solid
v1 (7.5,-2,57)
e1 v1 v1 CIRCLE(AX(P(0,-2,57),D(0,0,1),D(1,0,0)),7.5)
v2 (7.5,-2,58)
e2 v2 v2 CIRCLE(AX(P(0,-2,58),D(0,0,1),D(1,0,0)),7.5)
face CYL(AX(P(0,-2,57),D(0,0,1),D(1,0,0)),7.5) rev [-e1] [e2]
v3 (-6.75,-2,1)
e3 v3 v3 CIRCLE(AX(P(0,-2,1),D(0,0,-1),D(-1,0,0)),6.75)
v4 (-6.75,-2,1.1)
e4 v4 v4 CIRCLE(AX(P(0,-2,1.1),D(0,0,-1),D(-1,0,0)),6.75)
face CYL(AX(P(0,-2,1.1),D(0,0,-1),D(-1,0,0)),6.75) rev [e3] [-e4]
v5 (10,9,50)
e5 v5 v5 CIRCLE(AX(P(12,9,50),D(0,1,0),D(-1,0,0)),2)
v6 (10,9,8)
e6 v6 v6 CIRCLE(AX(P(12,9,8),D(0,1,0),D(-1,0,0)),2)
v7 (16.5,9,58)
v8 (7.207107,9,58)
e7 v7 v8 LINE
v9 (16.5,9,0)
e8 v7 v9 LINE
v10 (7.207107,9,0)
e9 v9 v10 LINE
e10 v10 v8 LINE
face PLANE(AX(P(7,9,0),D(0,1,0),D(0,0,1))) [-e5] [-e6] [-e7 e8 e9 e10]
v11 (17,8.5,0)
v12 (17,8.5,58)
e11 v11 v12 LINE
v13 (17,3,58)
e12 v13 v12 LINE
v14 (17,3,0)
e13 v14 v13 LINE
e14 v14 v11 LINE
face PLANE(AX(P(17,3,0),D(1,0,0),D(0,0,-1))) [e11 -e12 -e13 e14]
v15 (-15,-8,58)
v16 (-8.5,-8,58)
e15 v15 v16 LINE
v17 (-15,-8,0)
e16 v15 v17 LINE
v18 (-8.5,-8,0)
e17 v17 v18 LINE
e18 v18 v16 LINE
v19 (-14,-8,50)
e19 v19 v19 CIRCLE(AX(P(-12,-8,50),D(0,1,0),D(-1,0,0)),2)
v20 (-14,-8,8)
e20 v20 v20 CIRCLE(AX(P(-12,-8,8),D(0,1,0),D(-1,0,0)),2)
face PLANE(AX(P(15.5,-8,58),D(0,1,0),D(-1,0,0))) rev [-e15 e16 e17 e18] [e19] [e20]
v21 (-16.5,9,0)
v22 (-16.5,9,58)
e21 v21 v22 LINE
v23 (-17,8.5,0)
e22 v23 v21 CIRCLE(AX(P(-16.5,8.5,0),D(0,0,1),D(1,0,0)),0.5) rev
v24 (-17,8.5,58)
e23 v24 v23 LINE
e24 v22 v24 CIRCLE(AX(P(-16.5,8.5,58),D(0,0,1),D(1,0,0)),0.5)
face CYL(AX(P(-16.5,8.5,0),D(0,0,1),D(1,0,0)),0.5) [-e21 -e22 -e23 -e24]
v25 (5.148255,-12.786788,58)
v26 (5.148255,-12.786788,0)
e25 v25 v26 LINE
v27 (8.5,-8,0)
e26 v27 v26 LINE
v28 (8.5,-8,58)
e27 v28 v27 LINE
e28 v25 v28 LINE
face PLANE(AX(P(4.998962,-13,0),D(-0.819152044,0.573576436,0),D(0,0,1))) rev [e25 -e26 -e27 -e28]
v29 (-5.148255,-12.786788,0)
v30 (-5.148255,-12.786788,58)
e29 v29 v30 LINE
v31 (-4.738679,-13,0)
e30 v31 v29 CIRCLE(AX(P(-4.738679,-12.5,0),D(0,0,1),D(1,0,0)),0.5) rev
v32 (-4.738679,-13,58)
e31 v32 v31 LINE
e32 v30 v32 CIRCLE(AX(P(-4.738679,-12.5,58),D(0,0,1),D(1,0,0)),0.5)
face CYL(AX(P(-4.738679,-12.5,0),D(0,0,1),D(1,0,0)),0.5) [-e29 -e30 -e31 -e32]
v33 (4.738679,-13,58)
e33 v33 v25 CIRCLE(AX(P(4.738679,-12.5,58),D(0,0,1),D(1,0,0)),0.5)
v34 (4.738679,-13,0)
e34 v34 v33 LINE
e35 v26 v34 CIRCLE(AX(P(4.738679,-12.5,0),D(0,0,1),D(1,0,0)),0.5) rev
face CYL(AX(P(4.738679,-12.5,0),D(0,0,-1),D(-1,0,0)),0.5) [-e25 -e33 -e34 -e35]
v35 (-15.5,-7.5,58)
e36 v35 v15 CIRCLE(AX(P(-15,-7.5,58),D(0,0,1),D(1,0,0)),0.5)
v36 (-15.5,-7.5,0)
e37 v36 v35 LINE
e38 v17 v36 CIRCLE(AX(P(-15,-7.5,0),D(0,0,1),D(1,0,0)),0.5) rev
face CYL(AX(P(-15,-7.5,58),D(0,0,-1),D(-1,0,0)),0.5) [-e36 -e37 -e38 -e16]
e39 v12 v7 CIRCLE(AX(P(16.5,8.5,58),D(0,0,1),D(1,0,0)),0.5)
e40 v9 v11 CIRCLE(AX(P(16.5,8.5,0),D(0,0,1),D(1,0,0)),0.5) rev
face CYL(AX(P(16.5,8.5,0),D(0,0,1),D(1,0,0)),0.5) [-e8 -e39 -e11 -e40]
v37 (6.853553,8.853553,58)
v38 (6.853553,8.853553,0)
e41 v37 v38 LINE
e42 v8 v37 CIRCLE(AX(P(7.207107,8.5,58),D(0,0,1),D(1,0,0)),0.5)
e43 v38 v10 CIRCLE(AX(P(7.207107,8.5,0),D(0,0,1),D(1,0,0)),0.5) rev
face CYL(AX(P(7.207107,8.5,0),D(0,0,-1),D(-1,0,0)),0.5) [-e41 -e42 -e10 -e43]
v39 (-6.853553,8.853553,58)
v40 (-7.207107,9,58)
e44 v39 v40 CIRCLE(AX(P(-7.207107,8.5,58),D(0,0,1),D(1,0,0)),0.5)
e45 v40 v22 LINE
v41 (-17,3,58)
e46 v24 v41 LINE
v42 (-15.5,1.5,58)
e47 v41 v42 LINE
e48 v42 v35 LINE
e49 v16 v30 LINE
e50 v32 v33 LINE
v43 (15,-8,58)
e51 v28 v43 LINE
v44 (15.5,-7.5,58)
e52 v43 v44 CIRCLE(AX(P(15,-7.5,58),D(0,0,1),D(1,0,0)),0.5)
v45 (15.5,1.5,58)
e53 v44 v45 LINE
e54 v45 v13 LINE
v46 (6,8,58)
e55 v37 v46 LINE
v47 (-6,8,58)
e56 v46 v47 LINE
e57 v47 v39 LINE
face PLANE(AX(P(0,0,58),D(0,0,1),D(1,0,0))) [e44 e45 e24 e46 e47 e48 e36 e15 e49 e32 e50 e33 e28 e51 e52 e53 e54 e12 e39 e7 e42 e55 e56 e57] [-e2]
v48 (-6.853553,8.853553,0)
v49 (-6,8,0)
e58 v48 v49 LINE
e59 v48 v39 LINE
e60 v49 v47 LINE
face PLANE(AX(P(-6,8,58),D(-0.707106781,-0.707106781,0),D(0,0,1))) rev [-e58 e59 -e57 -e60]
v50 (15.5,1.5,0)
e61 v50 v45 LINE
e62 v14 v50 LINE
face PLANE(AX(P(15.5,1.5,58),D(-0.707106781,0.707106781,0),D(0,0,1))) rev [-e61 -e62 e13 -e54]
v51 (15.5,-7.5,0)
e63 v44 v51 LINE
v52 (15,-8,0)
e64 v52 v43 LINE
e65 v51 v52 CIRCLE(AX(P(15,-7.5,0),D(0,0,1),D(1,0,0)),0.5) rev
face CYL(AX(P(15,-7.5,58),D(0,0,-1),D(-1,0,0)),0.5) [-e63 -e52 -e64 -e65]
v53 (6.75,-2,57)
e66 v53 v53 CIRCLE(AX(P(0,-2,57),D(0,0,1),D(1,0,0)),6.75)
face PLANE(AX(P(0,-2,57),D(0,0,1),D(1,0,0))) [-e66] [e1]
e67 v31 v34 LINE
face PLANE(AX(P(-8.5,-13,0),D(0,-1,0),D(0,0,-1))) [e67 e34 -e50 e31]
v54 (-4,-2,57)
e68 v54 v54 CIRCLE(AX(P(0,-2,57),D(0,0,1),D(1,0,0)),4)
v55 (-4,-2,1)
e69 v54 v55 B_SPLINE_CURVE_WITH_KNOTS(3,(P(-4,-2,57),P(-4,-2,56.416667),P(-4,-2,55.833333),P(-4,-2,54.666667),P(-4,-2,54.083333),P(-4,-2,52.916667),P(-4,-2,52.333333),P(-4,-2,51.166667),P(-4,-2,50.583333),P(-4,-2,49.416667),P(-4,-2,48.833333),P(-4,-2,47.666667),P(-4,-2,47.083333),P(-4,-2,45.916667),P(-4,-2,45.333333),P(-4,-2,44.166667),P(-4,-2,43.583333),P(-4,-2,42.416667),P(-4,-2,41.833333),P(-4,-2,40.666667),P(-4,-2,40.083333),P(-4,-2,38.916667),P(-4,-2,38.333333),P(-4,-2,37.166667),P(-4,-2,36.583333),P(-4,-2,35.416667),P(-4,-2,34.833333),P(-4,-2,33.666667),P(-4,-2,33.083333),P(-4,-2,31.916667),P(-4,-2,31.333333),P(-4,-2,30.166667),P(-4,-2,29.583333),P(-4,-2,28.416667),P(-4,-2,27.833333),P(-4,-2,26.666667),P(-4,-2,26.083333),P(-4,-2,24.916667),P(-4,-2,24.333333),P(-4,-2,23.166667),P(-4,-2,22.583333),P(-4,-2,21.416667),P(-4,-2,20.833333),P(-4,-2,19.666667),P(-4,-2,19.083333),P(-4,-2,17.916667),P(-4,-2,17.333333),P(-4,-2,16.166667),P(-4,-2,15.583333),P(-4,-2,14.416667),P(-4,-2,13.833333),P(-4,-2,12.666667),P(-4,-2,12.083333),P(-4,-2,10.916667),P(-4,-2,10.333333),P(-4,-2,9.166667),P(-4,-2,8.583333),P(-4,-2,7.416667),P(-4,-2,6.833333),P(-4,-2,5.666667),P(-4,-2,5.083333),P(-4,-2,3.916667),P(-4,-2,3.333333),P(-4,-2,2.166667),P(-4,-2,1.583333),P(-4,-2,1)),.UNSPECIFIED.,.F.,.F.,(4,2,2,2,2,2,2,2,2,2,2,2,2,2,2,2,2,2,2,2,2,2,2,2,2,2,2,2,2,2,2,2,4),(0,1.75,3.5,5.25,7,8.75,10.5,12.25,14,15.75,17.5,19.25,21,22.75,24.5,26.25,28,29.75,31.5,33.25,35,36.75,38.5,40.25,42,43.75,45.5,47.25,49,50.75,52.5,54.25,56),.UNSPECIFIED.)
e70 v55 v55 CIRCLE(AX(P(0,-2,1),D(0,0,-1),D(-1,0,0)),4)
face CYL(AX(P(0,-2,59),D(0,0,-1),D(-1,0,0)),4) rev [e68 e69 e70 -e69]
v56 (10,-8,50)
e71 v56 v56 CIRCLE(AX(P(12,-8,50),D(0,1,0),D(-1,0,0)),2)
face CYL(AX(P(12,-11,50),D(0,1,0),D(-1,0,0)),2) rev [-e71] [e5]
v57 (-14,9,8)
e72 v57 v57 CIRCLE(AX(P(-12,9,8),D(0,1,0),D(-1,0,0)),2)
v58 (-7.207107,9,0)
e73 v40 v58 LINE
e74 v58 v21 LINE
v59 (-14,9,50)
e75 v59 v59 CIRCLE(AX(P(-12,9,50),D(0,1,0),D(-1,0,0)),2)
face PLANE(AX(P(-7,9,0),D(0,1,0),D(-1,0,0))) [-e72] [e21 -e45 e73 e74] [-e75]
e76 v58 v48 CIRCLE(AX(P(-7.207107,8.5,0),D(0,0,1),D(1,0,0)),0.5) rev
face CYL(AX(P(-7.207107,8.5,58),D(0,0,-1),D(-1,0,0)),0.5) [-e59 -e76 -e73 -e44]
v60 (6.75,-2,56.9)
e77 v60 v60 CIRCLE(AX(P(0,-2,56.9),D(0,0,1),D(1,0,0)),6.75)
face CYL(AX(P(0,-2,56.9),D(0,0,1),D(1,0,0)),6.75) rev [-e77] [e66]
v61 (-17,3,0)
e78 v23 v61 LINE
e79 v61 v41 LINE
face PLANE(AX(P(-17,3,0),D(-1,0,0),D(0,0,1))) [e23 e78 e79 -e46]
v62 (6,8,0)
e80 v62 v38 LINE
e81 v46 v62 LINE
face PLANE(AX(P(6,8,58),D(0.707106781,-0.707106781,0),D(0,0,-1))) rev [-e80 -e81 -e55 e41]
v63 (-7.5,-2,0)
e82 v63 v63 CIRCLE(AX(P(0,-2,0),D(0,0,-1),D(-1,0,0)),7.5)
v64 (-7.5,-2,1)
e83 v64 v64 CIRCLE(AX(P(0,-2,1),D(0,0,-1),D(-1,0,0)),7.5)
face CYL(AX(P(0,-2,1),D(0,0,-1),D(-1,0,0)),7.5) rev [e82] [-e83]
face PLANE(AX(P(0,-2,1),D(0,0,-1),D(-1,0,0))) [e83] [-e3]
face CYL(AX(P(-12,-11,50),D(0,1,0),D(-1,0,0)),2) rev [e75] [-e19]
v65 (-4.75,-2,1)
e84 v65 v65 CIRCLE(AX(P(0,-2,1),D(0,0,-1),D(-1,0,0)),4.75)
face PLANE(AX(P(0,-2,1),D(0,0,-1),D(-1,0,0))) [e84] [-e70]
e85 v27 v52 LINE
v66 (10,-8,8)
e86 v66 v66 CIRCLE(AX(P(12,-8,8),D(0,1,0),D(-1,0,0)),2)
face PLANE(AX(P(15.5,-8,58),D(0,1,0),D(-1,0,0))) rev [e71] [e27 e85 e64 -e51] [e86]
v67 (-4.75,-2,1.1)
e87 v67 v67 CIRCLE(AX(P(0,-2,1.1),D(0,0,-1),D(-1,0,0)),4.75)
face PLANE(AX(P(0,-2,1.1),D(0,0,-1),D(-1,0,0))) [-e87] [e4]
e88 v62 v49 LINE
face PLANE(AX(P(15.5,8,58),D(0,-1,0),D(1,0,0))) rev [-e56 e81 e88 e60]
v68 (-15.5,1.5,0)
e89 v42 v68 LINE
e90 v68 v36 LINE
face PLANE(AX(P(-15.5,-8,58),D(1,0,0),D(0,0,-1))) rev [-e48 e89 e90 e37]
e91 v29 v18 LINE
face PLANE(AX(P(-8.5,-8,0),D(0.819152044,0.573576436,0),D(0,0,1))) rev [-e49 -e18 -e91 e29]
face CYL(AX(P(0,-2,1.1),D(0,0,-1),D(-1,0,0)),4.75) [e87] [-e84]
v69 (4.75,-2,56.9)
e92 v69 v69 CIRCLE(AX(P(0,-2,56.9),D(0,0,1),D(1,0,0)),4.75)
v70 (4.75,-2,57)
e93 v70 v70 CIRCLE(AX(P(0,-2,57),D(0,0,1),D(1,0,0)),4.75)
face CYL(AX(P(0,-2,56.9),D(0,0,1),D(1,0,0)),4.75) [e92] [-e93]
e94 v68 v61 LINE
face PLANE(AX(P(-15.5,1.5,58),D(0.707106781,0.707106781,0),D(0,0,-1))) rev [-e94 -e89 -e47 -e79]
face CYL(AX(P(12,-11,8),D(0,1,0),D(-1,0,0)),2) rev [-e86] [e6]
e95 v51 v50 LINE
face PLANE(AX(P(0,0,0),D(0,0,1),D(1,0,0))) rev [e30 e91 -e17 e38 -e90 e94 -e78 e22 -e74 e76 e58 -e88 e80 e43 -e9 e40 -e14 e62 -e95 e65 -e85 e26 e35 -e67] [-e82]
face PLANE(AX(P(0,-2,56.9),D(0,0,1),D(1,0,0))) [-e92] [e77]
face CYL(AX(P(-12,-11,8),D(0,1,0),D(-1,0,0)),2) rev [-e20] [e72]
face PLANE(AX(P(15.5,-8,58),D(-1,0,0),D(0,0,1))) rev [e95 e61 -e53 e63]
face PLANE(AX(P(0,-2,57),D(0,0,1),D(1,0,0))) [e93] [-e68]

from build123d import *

# Parameters (mm, degrees)
SKETCH1_W           = 31
SKETCH1_H           = 16
BOSS_EXTRUDE1_DEPTH = 58
SKETCH2_W           = 17
SKETCH2_H           = 21
BOSS_EXTRUDE2_DEPTH = 58
SKETCH3_W           = 10
SKETCH3_H           = 6
BOSS_EXTRUDE3_DEPTH = 58
CHAMFER1_SIZE       = 1
CHAMFER2_SIZE       = 1.5
CHAMFER5_SIZE2      = 3.501037691
CHAMFER5_SIZE       = 5
CHAMFER6_SIZE2      = 5
CHAMFER6_SIZE       = 3.501037691
SKETCH4_R           = 7.5
CUT_EXTRUDE1_DEPTH  = 1
CUT_EXTRUDE2_START  = -1
SKETCH5_R           = 7.5
CUT_EXTRUDE2_DEPTH  = 1
SKETCH6_R           = 4
CUT_EXTRUDE3_DEPTH  = 58
SKETCH7_R           = 2
CUT_EXTRUDE4_DEPTH  = 20
SKETCH8_R           = 6.75
SKETCH8_R_2         = 4.75
CUT_EXTRUDE5_DEPTH  = 0.1
CUT_EXTRUDE6_START  = -0.1
SKETCH9_R           = 6.75
SKETCH9_R_2         = 4.75
CUT_EXTRUDE6_DEPTH  = 0.1
FILLET1_R           = 0.5
FILLET2_START       = -1
FILLET2_DEPTH       = 60


with BuildPart() as part:
    # Sketch1 → Boss-Extrude1 (new body)
    with BuildSketch(Plane.XY):
        Rectangle(SKETCH1_W, SKETCH1_H)
    extrude(amount=BOSS_EXTRUDE1_DEPTH)

    # Sketch2 → Boss-Extrude2 (add)
    with BuildSketch(Plane.XY.offset(58)):
        with Locations((0, -2.5)):
            Rectangle(SKETCH2_W, SKETCH2_H)
    extrude(amount=-BOSS_EXTRUDE2_DEPTH)

    # Sketch3 → Boss-Extrude3 (add)
    with BuildSketch(Plane.XY.offset(58)):
        with Locations((-12, 6)):
            Rectangle(SKETCH3_W, SKETCH3_H)
        with Locations((12, 6)):
            Rectangle(SKETCH3_W, SKETCH3_H)
    extrude(amount=-BOSS_EXTRUDE3_DEPTH)

    # Chamfer1
    chamfer1_edges = [part.edges().sort_by_distance(p)[0] for p in [
        (7, 8, 29),
        (-7, 8, 29),
    ]]
    chamfer(chamfer1_edges, length=CHAMFER1_SIZE - 0.0001)  # a hair under: the kernel refuses the full size

    # Chamfer2
    chamfer2_edges = [part.edges().sort_by_distance(p)[0] for p in [
        (15.5, 3, 29),
        (-15.5, 3, 29),
    ]]
    chamfer(chamfer2_edges, length=CHAMFER2_SIZE - 0.0001)  # a hair under: the kernel refuses the full size

    # Chamfer5
    chamfer5_edges = [part.edges().sort_by_distance(p)[0] for p in [
        (-8.5, -13, 29),
    ]]
    chamfer5_side = [part.faces().sort_by_distance(p)[0] for p in [
        (-8.5, -12.929979246, 29),
    ]]
    chamfer(chamfer5_edges, length=CHAMFER5_SIZE - 0.0001, length2=CHAMFER5_SIZE2 - 0.0001, reference=chamfer5_side[0])  # a hair under: the kernel refuses the full size

    # Chamfer6
    chamfer6_edges = [part.edges().sort_by_distance(p)[0] for p in [
        (8.5, -13, 29),
    ]]
    chamfer6_side = [part.faces().sort_by_distance(p)[0] for p in [
        (8.429979246, -13, 29),
    ]]
    chamfer(chamfer6_edges, length=CHAMFER6_SIZE - 0.0001, length2=CHAMFER6_SIZE2 - 0.0001, reference=chamfer6_side[0])  # a hair under: the kernel refuses the full size

    # Sketch4 → Cut-Extrude1 (cut)
    with BuildSketch(Plane.XY.offset(58)):
        with Locations((0, -2)):
            Circle(SKETCH4_R)
    extrude(amount=-CUT_EXTRUDE1_DEPTH, mode=Mode.SUBTRACT)

    # Sketch5 → Cut-Extrude2 (cut)
    with BuildSketch(Plane(origin=(0, 0, 0), x_dir=(-1, 0, 0), z_dir=(0, 0, -1)).offset(CUT_EXTRUDE2_START)):
        with Locations(Location((0, -2, 0), (0, 0, 180))):
            Circle(SKETCH5_R)
    extrude(amount=CUT_EXTRUDE2_DEPTH, mode=Mode.SUBTRACT)

    # Sketch6 → Cut-Extrude3 (cut)
    with BuildSketch(Plane(origin=(0, 0, 1), x_dir=(-1, 0, 0), z_dir=(0, 0, -1))):
        with Locations((0, -2)):
            Circle(SKETCH6_R)
    extrude(amount=-CUT_EXTRUDE3_DEPTH, mode=Mode.SUBTRACT)

    # Sketch7 → Cut-Extrude4 (cut)
    with BuildSketch(Plane(origin=(0, 9, 0), x_dir=(1, 0, 0), z_dir=(0, 1, 0))):
        with Locations(Location((-12, -8, 0), (0, 0, 180))):
            Circle(SKETCH7_R)
        with Locations(Location((12, -8, 0), (0, 0, 180))):
            Circle(SKETCH7_R)
        with Locations(Location((12, -50, 0), (0, 0, 180))):
            Circle(SKETCH7_R)
        with Locations(Location((-12, -50, 0), (0, 0, 180))):
            Circle(SKETCH7_R)
    extrude(amount=-CUT_EXTRUDE4_DEPTH, mode=Mode.SUBTRACT)

    # Sketch8 → Cut-Extrude5 (cut)
    with BuildSketch(Plane.XY.offset(57)):
        with Locations((0, -2)):
            Circle(SKETCH8_R)
        with Locations((0, -2)):
            Circle(SKETCH8_R_2, mode=Mode.SUBTRACT)
    extrude(amount=-CUT_EXTRUDE5_DEPTH, mode=Mode.SUBTRACT)

    # Sketch9 → Cut-Extrude6 (cut)
    with BuildSketch(Plane(origin=(0, 0, 1), x_dir=(-1, 0, 0), z_dir=(0, 0, -1)).offset(CUT_EXTRUDE6_START)):
        with Locations(Location((0, -2, 0), (0, 0, 180))):
            Circle(SKETCH9_R)
        with Locations(Location((0, -2, 0), (0, 0, 180))):
            Circle(SKETCH9_R_2, mode=Mode.SUBTRACT)
    extrude(amount=CUT_EXTRUDE6_DEPTH, mode=Mode.SUBTRACT)

    # Fillet1
    fillet1_edges = [part.edges().sort_by_distance(p)[0] for p in [
        (-4.999062309, -13, 29),
        (4.999062309, -13, 29),
        (-17, 9, 29),
        (17, 9, 29),
        (15.5, -8, 29),
        (-15.5, -8, 29),
    ]]
    fillet(fillet1_edges, radius=FILLET1_R)

    # Fillet2: read off the stored shape, not the designer's step
    # Fillet2 outline → Fillet2 (cut)
    with BuildSketch(Plane.XY.offset(FILLET2_START)):
        with BuildLine():
            Line((7, 9), (6.853553391, 8.853553391))
            ThreePointArc((6.853553391, 8.853553391), (7.015765065, 8.961939766), (7.207106781, 9))
            Line((7.207106781, 9), (7, 9))
        make_face()
        with BuildLine():
            Line((-7, 9), (-7.207106781, 9))
            ThreePointArc((-7.207106781, 9), (-7.015765065, 8.961939766), (-6.853553391, 8.853553391))
            Line((-6.853553391, 8.853553391), (-7, 9))
        make_face()
    extrude(amount=FILLET2_DEPTH, mode=Mode.SUBTRACT)


solid = part.part
